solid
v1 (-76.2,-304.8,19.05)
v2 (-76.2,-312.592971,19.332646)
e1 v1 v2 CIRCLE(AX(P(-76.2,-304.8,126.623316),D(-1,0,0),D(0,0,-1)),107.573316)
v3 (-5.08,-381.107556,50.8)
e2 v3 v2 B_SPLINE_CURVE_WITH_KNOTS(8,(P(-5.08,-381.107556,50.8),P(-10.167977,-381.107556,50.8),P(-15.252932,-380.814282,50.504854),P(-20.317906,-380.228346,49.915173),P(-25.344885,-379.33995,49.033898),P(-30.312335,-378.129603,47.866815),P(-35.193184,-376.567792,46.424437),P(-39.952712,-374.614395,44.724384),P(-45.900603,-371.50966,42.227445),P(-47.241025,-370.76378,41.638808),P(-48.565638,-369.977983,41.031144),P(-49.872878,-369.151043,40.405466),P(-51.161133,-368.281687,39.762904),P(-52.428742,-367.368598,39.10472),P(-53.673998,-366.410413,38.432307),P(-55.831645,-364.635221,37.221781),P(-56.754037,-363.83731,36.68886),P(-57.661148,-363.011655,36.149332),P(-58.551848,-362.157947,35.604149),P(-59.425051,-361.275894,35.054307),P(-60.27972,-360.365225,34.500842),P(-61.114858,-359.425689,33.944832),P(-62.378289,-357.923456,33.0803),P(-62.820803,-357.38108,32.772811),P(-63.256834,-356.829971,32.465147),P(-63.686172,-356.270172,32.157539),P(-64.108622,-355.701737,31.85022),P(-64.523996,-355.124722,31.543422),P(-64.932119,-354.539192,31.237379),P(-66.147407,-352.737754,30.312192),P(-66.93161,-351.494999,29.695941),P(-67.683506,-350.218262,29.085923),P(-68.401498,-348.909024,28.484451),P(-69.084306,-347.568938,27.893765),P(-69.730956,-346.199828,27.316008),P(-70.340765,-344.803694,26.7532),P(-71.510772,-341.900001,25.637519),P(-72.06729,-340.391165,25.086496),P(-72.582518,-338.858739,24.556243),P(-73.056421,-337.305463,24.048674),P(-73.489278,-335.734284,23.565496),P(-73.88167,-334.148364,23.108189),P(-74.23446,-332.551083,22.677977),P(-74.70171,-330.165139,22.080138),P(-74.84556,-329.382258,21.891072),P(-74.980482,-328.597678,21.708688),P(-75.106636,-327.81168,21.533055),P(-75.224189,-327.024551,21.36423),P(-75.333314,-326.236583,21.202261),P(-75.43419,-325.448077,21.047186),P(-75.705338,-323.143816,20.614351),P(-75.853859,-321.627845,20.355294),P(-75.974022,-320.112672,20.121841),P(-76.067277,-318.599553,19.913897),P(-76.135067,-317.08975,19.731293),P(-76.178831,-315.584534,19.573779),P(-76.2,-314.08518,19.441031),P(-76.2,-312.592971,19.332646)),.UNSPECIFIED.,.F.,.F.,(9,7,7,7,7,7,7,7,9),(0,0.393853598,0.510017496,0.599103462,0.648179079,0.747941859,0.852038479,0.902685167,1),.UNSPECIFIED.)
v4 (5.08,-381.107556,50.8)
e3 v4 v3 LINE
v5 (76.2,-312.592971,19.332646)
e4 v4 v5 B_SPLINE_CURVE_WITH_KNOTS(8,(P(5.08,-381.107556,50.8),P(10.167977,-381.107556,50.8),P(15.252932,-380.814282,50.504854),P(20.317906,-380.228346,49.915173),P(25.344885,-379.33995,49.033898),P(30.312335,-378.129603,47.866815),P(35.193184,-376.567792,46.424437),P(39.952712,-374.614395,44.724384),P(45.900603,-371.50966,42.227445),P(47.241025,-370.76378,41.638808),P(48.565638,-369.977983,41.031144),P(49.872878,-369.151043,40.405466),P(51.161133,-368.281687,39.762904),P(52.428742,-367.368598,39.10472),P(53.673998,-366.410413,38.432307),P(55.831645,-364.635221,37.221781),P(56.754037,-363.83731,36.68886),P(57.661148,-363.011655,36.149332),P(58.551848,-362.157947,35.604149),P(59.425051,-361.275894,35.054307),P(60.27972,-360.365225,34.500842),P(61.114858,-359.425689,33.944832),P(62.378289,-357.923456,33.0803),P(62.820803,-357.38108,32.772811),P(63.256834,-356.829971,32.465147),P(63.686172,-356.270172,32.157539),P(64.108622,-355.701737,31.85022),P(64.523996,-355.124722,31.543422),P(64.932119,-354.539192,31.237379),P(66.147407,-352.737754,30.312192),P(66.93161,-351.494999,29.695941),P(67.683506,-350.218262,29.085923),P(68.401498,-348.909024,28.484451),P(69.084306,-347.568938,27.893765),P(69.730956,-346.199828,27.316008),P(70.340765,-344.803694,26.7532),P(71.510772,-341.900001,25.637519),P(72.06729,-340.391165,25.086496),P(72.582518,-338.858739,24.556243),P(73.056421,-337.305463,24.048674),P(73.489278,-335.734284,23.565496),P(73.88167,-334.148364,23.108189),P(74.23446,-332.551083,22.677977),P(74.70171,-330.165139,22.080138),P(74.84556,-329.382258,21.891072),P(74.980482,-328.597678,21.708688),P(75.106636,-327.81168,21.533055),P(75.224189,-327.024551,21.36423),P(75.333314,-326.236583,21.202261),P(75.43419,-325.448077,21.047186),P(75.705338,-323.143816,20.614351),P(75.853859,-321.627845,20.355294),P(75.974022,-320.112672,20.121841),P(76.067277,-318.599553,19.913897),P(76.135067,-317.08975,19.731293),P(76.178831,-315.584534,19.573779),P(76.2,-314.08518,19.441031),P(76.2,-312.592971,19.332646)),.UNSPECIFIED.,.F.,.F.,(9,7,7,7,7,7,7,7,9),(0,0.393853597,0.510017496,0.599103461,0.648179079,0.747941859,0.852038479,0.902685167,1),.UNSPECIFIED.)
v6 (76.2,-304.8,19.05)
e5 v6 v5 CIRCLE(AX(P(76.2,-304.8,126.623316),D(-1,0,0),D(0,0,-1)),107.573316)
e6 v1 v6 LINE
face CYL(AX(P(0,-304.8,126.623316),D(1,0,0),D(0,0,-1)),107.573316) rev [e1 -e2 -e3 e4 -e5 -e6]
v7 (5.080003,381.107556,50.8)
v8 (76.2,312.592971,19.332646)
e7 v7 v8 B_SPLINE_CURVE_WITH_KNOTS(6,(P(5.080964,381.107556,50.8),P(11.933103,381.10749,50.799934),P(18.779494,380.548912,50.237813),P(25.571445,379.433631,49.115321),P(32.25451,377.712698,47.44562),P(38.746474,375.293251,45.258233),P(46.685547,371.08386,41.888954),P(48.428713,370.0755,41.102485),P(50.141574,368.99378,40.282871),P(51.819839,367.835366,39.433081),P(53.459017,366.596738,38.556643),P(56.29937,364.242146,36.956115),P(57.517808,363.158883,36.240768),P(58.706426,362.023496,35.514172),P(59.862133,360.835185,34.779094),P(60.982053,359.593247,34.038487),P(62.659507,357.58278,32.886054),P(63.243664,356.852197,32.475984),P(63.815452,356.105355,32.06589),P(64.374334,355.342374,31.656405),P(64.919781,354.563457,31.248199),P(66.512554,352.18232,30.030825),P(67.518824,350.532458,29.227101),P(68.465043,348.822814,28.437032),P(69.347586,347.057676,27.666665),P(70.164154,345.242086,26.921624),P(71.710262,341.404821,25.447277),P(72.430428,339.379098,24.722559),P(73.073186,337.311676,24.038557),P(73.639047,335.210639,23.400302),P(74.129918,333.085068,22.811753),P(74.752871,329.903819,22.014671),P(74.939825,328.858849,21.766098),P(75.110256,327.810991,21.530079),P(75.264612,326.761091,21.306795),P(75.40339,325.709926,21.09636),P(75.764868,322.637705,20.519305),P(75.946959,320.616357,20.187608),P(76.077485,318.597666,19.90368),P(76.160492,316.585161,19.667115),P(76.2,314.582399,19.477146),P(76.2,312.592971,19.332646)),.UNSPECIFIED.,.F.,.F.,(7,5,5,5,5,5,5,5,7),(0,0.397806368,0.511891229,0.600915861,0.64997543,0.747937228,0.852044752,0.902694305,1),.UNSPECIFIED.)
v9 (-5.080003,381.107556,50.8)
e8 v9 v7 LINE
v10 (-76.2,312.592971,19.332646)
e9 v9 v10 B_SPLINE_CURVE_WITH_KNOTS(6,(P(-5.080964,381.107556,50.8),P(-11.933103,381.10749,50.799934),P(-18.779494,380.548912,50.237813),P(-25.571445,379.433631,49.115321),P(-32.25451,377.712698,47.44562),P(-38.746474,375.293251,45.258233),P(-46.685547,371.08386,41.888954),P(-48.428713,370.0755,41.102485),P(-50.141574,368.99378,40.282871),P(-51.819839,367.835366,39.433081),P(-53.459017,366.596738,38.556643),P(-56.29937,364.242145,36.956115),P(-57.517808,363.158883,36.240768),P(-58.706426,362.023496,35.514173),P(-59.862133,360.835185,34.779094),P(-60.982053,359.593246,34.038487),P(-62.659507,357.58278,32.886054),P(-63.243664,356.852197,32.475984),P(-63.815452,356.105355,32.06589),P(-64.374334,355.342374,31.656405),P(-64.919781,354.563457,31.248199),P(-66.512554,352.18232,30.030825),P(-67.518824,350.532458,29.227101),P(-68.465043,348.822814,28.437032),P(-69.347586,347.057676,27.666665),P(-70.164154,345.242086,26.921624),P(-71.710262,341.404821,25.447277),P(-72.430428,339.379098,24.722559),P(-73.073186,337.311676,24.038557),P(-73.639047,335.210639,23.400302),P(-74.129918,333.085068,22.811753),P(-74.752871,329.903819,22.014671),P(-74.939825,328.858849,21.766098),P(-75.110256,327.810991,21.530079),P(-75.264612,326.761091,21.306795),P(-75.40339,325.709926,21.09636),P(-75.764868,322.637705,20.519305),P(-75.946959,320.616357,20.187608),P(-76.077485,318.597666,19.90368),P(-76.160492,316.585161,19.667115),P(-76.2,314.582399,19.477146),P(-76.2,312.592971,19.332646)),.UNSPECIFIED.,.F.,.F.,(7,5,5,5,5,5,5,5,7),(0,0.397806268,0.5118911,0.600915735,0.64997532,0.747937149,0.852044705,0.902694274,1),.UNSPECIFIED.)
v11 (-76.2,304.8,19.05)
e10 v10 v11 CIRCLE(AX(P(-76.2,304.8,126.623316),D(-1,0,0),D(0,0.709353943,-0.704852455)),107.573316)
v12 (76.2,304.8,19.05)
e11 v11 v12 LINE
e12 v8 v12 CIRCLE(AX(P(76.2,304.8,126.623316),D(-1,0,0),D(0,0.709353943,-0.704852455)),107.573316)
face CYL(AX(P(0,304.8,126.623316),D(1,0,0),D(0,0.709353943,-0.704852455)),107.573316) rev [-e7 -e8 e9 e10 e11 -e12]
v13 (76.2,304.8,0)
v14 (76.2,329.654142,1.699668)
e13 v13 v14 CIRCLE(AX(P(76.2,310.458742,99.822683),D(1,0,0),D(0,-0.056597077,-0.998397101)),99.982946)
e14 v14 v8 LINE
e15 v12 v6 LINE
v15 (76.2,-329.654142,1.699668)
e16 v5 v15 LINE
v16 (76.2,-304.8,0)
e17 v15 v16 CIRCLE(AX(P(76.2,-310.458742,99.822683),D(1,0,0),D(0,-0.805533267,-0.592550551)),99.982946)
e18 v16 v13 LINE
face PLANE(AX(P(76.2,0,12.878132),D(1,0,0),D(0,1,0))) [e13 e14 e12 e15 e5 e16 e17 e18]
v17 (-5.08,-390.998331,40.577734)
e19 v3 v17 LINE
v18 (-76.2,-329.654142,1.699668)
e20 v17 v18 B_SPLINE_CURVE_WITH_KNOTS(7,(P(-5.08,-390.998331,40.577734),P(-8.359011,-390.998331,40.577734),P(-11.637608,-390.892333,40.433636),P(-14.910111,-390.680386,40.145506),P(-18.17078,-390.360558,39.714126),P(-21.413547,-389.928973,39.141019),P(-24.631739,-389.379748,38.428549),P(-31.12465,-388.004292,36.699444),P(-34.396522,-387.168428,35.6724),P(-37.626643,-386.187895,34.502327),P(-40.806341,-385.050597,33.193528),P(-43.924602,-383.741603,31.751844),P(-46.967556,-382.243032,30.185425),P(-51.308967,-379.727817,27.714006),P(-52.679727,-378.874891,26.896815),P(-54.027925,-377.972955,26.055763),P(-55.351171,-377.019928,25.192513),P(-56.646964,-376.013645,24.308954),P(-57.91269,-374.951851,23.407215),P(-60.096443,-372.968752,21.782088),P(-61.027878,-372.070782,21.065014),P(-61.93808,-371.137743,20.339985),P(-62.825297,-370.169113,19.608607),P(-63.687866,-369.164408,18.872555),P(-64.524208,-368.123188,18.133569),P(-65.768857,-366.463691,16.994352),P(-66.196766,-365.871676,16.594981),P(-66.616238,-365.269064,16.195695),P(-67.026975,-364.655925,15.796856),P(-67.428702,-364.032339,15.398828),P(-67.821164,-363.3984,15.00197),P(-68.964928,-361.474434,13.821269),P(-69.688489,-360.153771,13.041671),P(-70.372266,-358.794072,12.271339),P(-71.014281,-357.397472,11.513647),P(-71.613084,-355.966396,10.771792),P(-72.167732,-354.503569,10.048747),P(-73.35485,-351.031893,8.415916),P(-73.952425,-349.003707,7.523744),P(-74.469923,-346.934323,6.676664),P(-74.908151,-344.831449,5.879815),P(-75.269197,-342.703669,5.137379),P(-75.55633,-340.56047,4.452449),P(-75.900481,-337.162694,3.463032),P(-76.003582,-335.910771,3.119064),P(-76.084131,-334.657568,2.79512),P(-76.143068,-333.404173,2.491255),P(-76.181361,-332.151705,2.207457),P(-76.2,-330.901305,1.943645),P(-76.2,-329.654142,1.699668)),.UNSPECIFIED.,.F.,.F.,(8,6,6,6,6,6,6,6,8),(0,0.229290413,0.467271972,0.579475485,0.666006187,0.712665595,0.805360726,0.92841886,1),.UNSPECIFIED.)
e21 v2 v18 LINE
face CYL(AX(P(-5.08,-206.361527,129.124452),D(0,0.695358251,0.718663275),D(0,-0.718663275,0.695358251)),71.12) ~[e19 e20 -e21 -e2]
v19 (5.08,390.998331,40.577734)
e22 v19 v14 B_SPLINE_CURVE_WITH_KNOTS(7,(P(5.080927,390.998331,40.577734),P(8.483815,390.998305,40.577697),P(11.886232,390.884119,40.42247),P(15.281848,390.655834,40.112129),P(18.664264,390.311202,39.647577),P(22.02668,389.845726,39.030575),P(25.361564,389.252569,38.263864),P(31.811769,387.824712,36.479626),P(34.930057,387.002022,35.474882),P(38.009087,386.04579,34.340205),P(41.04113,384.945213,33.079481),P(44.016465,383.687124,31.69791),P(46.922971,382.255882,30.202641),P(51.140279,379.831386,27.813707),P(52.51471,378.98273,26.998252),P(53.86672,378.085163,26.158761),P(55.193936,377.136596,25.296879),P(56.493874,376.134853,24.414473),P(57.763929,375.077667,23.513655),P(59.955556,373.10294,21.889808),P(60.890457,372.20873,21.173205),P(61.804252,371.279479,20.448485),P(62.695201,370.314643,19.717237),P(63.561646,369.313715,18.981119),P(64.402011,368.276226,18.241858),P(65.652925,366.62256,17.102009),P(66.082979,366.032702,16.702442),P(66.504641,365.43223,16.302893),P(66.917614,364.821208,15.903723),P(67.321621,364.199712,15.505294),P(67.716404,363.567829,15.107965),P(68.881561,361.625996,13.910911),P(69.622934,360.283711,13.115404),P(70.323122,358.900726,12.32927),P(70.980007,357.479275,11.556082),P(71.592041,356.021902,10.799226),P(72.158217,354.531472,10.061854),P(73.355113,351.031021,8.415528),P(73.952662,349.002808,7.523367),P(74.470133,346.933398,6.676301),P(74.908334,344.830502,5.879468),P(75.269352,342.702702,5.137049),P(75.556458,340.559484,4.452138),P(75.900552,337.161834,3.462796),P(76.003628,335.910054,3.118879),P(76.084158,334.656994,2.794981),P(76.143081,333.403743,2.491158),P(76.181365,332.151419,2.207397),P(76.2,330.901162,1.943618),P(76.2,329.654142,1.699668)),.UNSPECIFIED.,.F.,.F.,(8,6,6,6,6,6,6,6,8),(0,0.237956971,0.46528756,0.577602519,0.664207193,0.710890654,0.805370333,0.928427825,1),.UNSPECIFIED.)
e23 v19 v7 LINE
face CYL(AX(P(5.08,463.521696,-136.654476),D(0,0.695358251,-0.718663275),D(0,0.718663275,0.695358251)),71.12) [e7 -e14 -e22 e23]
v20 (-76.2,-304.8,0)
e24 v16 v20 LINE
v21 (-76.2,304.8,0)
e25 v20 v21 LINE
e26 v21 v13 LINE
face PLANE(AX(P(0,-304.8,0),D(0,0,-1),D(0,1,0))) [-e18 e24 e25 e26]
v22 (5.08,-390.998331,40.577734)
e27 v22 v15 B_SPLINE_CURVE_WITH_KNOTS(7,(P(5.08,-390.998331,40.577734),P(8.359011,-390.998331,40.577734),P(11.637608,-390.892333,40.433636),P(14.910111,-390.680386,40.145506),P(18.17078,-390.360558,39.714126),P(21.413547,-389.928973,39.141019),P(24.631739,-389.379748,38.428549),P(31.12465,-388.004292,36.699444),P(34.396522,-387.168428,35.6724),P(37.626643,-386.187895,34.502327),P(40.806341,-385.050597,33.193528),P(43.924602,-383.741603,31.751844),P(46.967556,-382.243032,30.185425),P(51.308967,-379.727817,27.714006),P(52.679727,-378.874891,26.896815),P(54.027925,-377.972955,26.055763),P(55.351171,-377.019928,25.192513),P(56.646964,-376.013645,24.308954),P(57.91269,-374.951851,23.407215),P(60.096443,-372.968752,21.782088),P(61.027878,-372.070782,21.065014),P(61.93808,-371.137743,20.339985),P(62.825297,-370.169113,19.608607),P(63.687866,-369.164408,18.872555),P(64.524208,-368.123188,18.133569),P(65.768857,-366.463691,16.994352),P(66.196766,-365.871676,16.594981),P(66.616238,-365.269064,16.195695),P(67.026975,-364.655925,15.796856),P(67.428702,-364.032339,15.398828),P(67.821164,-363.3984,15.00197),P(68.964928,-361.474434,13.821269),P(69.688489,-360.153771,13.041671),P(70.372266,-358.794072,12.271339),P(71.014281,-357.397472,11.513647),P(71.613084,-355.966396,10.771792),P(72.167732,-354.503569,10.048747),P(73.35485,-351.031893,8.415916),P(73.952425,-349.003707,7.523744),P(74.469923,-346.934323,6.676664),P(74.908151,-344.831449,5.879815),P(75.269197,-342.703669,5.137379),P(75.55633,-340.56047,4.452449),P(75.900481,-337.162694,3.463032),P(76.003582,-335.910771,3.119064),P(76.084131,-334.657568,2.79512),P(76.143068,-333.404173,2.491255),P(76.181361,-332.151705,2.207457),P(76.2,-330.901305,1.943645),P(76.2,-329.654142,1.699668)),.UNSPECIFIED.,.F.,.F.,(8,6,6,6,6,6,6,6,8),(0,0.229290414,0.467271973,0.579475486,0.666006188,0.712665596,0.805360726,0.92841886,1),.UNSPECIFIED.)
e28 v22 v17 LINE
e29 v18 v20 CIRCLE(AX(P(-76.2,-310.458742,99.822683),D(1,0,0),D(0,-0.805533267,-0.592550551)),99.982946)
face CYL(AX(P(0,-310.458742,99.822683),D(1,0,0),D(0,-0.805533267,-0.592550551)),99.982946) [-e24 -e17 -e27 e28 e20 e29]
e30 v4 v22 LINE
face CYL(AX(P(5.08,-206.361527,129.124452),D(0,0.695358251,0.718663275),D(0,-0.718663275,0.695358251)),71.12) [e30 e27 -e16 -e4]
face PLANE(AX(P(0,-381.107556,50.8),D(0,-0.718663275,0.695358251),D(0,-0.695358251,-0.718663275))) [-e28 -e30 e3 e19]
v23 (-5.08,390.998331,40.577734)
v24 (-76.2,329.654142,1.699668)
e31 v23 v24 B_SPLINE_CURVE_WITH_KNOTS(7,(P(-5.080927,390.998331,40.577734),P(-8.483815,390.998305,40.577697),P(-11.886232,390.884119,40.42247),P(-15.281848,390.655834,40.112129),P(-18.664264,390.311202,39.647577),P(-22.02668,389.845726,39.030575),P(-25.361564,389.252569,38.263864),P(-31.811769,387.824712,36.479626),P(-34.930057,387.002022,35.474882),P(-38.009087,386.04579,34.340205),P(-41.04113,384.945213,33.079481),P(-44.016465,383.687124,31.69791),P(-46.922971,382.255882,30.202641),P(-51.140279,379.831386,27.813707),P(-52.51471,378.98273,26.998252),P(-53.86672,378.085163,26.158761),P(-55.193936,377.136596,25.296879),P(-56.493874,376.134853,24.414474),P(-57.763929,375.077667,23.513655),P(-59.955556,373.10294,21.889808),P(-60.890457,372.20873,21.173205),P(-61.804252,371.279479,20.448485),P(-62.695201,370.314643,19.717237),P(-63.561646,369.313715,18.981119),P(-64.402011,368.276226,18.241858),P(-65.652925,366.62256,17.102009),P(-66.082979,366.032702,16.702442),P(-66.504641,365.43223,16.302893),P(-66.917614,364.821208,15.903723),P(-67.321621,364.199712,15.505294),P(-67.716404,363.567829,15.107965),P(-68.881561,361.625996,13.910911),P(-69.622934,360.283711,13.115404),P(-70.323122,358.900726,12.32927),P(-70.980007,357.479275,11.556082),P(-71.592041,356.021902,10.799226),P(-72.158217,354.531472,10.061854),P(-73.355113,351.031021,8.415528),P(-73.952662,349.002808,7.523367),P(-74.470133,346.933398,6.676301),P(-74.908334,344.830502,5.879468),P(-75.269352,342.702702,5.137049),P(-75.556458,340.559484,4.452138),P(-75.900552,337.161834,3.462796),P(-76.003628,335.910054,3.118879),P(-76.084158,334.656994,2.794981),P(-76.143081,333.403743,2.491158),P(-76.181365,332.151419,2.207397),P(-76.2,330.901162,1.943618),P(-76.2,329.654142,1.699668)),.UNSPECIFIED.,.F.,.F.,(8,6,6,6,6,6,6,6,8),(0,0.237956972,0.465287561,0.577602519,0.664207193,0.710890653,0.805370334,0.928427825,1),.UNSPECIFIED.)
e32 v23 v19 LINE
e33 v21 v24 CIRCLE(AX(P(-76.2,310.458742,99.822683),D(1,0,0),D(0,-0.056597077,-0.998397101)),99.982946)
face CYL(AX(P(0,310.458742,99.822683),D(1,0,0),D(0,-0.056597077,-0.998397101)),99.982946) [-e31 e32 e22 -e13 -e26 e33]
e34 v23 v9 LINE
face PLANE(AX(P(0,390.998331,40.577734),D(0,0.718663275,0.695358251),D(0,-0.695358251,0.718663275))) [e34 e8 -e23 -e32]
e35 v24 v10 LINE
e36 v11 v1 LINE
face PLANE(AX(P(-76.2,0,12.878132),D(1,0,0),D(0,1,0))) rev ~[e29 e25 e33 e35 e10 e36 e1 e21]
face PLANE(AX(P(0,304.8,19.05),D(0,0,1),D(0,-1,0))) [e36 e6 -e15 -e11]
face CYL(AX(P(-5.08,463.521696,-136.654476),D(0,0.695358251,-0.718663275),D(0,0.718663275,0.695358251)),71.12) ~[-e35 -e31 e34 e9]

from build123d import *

# Parameters (mm, degrees)
F1_DEPTH    = 76.2
F2_T1_DEPTH = 369.824
F2_T3_DEPTH = 369.824


# Not quite as in the source:
# - a fillet or chamfer that OpenCascade refuses, or shapes differently, is made with other operations: its cross-section is extruded or revolved along the edge and cut away or added


with BuildPart() as f1:
    # F0 (on Right) → F1 (new body, symmetric)
    with BuildSketch(Plane.YZ):
        with BuildLine():
            Line((-304.8, 0), (0, 0))
            Line((0, 0), (304.8, 0))
            ThreePointArc((304.8, 0), (353.0430518596, 9.3618295777), (390.9983313803, 40.5777335736))
            Line((390.9983313803, 40.5777335736), (381.1075556217, 50.8))
            ThreePointArc((381.1075556217, 50.8), (346.1246462325, 27.304174222), (304.8, 19.05))
            Line((304.8, 19.05), (0, 19.05))
            Line((0, 19.05), (-304.8, 19.05))
            ThreePointArc((-304.8, 19.05), (-346.1246462325, 27.304174222), (-381.1075556217, 50.8))
            Line((-381.1075556217, 50.8), (-390.9983313803, 40.5777335736))
            ThreePointArc((-390.9983313803, 40.5777335736), (-353.0430518596, 9.3618295777), (-304.8, 0))
        make_face()
    extrude(amount=F1_DEPTH, both=True)

    # F2: fillet of radius 71.12 on 4 edges, made by hand

    # F2_s2 → F2_t1 (cut)
    with BuildSketch(Plane(origin=(0, -35.2534039099, -36.4349264406), x_dir=(1, 0, 0), z_dir=(0, -0.6953582507, -0.7186632752))):
        with BuildLine():
            ThreePointArc((5.08, 309.212203264), (55.369434278, 288.381637542), (76.2, 238.092203264))
            Line((76.2, 238.092203264), (76.2, 309.212203264))
            Line((76.2, 309.212203264), (5.08, 309.212203264))
        make_face()
        with BuildLine():
            ThreePointArc((-5.08, 309.212203264), (-55.369434278, 288.381637542), (-76.2, 238.092203264))
            Line((-76.2, 238.092203264), (-76.2, 309.212203264))
            Line((-76.2, 309.212203264), (-5.08, 309.212203264))
        make_face()
    extrude(amount=F2_T1_DEPTH, mode=Mode.SUBTRACT)

    # F2_s4 → F2_t3 (cut)
    with BuildSketch(Plane(origin=(0, 292.4135736338, -302.2138535277), x_dir=(1, 0, 0), z_dir=(0, -0.6953582507, 0.7186632752))):
        with BuildLine():
            ThreePointArc((5.08, 309.212203264), (55.369434278, 288.381637542), (76.2, 238.092203264))
            Line((76.2, 238.092203264), (76.2, 309.212203264))
            Line((76.2, 309.212203264), (5.08, 309.212203264))
        make_face()
        with BuildLine():
            ThreePointArc((-5.08, 309.212203264), (-55.369434278, 288.381637542), (-76.2, 238.092203264))
            Line((-76.2, 238.092203264), (-76.2, 309.212203264))
            Line((-76.2, 309.212203264), (-5.08, 309.212203264))
        make_face()
    extrude(amount=F2_T3_DEPTH, mode=Mode.SUBTRACT)


solid = f1.part
